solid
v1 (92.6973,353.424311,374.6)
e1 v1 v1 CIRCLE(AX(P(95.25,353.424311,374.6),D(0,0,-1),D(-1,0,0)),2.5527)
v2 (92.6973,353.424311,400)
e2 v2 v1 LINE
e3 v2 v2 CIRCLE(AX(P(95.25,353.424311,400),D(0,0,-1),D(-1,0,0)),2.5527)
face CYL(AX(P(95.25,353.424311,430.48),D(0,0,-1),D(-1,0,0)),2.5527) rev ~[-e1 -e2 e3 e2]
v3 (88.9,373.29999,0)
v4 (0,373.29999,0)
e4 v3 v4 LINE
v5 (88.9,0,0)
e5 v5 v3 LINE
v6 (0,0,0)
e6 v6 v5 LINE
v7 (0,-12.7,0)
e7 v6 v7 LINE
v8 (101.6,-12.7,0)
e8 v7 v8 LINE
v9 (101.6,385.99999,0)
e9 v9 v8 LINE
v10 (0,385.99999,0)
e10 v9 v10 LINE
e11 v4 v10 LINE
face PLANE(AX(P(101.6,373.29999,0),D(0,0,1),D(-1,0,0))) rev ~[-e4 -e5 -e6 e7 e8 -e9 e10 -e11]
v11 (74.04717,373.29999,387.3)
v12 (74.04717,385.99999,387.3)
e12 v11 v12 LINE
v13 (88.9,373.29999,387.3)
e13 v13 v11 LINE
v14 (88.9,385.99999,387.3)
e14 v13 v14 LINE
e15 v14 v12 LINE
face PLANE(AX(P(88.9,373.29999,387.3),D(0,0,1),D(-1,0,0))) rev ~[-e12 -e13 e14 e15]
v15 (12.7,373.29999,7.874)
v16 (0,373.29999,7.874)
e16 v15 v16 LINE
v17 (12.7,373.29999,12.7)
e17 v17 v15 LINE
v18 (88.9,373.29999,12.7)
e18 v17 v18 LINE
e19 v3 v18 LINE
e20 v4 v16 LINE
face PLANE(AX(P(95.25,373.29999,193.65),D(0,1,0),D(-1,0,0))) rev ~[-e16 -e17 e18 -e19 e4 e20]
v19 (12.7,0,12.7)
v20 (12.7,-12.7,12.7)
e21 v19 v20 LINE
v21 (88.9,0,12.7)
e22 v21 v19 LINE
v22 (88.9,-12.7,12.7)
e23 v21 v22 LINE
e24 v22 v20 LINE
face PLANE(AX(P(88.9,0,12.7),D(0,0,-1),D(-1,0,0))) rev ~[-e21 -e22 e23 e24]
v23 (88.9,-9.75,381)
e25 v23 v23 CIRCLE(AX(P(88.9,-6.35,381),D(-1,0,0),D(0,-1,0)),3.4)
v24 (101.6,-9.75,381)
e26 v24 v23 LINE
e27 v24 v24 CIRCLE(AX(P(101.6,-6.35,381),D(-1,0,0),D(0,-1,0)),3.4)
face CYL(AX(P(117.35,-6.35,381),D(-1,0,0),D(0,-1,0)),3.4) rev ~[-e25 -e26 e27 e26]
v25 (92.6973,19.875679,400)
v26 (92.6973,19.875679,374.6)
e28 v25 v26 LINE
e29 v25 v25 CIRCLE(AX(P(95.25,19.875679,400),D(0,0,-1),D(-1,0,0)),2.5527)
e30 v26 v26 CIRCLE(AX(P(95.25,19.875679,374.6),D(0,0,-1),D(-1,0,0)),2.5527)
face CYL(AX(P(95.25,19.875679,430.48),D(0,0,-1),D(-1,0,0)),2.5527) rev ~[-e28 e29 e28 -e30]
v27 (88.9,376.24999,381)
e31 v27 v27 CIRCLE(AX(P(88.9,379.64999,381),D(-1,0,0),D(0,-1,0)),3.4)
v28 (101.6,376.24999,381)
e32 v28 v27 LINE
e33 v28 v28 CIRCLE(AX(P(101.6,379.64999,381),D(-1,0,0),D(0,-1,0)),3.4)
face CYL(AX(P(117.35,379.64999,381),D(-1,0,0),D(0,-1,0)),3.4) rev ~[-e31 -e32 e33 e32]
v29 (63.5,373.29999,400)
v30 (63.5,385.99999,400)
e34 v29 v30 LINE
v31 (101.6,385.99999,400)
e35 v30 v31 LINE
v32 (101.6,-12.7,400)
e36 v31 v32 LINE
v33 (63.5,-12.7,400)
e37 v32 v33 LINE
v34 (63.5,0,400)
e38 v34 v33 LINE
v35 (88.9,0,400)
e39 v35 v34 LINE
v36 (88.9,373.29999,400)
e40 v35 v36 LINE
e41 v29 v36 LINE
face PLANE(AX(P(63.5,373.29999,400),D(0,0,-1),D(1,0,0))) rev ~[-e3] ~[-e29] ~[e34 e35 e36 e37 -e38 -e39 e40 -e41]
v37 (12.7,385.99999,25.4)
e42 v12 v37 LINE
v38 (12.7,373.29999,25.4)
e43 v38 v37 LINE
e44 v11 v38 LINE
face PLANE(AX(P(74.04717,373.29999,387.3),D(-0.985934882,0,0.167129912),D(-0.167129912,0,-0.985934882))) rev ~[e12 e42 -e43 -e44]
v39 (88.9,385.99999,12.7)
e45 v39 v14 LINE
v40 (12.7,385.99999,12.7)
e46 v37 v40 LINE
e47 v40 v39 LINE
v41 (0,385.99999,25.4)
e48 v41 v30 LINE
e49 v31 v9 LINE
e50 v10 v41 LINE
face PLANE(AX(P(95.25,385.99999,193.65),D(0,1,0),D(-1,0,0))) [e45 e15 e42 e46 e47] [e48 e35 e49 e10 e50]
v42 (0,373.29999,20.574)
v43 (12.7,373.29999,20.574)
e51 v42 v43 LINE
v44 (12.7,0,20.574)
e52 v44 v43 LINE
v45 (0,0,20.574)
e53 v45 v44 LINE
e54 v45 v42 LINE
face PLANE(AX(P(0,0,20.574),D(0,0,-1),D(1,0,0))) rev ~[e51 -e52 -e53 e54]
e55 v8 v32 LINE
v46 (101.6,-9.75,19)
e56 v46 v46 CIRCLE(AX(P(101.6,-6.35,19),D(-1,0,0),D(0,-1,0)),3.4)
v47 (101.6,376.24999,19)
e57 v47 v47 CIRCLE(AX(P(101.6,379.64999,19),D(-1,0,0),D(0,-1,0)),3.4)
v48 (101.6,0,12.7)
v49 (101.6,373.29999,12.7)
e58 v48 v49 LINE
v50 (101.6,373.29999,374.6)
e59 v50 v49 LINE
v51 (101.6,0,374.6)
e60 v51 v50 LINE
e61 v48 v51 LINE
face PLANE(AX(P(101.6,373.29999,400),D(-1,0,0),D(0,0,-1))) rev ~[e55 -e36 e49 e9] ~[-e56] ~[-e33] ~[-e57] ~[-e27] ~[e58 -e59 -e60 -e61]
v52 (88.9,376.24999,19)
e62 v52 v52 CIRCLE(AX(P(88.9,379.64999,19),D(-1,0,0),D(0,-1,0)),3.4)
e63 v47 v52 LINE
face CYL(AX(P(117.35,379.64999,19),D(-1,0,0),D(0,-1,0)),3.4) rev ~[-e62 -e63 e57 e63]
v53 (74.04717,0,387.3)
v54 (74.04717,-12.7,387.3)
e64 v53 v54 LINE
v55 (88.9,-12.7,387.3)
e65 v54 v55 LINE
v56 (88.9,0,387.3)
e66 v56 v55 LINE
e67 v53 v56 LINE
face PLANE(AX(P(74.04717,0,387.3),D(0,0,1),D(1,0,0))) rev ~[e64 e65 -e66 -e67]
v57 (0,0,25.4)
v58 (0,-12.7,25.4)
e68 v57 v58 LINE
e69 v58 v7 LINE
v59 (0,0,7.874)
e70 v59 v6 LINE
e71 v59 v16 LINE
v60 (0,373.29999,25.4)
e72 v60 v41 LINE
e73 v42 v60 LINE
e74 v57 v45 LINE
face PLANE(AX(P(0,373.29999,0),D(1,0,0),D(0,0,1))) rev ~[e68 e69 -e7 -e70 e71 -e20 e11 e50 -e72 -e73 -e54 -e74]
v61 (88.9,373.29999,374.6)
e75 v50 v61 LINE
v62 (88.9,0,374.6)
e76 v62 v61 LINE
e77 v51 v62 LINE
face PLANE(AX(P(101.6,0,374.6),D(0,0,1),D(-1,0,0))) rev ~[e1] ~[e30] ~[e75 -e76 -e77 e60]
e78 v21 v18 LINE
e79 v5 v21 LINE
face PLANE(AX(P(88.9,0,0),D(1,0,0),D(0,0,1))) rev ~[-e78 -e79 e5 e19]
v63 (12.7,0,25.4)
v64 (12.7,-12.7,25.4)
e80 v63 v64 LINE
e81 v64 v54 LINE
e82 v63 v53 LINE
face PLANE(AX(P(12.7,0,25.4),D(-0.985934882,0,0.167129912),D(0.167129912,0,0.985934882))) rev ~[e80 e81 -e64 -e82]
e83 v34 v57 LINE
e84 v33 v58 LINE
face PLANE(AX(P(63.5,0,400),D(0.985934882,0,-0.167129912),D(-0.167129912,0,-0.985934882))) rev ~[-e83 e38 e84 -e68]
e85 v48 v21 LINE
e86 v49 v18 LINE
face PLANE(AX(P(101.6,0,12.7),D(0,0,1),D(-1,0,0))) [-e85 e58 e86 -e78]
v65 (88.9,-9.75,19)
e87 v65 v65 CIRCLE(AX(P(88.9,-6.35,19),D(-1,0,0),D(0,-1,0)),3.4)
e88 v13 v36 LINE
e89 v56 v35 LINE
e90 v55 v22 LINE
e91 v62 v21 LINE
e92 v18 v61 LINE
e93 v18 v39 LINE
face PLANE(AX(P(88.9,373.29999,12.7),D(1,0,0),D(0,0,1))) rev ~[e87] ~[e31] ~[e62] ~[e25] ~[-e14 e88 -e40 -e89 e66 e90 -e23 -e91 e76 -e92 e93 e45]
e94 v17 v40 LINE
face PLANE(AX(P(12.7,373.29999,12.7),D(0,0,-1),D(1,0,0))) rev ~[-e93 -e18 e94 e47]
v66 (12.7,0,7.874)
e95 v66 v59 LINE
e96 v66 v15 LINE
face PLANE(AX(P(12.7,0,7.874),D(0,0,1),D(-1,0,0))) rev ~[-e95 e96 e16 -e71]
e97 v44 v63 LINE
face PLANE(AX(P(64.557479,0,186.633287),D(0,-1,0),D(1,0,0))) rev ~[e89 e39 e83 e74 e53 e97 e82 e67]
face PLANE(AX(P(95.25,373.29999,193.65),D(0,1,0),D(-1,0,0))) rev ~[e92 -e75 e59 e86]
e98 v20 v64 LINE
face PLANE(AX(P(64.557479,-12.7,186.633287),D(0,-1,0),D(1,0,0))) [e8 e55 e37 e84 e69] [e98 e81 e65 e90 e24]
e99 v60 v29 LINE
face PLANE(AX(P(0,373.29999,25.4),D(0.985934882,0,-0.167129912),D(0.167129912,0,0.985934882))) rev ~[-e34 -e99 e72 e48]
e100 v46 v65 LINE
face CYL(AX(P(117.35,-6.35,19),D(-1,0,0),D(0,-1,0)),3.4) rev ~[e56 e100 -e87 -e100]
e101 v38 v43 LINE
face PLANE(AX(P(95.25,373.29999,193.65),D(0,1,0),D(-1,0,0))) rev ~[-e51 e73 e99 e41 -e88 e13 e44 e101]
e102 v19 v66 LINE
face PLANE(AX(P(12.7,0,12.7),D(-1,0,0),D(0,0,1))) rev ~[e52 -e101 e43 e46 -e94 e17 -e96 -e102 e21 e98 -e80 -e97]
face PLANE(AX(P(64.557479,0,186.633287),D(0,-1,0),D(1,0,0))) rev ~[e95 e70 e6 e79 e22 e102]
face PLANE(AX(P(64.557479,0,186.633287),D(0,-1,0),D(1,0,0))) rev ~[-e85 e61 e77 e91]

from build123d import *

# Parameters (mm, degrees)
F1_DEPTH = 12.7
F2_W     = 12.7
F2_H     = 12.7
F3_DEPTH = 373.29999
F5_DEPTH = 12.7
F7_D     = 6.8
F7_DEPTH = 15.75
F7_TIP   = 2.0429261047
F9_D     = 5.1054
F9_DEPTH = 30.48
F9_TIP   = 1.5338169022


# Not quite as in the source:
# - a feature names something its author has since deleted; it is built from what else it names


with BuildPart() as f1:
    # F0 (on Front) → F1 (new body)
    with BuildSketch(Plane.XZ):
        Polygon((0, 25.4), (0, 0), (101.6, 0), (101.6, 387.3), (101.6, 400), (63.5, 400), align=None)
        Polygon((88.9, 387.3), (88.9, 12.7), (12.7, 12.7), (12.7, 25.4), (74.047170315, 387.3), align=None, mode=Mode.SUBTRACT)
    extrude(amount=F1_DEPTH)

    # F2 (on face) → F3 (join)
    with BuildSketch(Plane(origin=(0, 0, 0), x_dir=(-1, 0, 0), z_dir=(0, 1, 0))):
        with Locations((-95.25, 6.35)):
            Rectangle(F2_W, F2_H)
        with Locations((-95.25, 393.65)):
            Rectangle(F2_W, F2_H)
        Polygon((-12.7, 20.574), (-12.7, 12.7), (-12.7, 7.874), (0, 7.874), (0, 20.574), align=None)
        with Locations((-95.25, 380.95)):
            Rectangle(F2_W, F2_H)
    extrude(amount=F3_DEPTH)

    # F4 (on face) → F5 (join)
    with BuildSketch(Plane(origin=(0, 373.29999, 0), x_dir=(-1, 0, 0), z_dir=(0, 1, 0))):
        Polygon((-101.6, 374.6), (-101.6, 12.7), (-88.9, 12.7), (-88.9, 239.3), (-88.9, 374.6), align=None)
        Polygon((-101.6, 12.7), (-101.6, 0), (0, 0), (0, 25.4), (-63.5, 400), (-88.9, 400), (-88.9, 387.3), (-74.047170315, 387.3), (-12.7, 25.4), (-12.7, 12.7), (-88.9, 12.7), align=None)
        Polygon((-101.6, 400), (-101.6, 374.6), (-88.9, 374.6), (-88.9, 387.3), (-88.9, 400), align=None)
    extrude(amount=F5_DEPTH)

    # F7
    with Locations(Plane.YZ.offset(101.6)):
        with Locations((-6.35, 19), (-6.35, 381), (379.64999, 381), (379.64999, 19)):
            Hole(F7_D / 2, depth=F7_DEPTH)
            with Locations((0, 0, -(F7_DEPTH + F7_TIP / 2))):  # 118° drill point
                Cone(0, F7_D / 2, F7_TIP, mode=Mode.SUBTRACT)

    # F9
    with Locations(Plane.XY.offset(400)):
        with Locations((95.25, 353.4243106842), (95.25, 19.8756793158)):
            Hole(F9_D / 2, depth=F9_DEPTH)
            with Locations((0, 0, -(F9_DEPTH + F9_TIP / 2))):  # 118° drill point
                Cone(0, F9_D / 2, F9_TIP, mode=Mode.SUBTRACT)


solid = f1.part
